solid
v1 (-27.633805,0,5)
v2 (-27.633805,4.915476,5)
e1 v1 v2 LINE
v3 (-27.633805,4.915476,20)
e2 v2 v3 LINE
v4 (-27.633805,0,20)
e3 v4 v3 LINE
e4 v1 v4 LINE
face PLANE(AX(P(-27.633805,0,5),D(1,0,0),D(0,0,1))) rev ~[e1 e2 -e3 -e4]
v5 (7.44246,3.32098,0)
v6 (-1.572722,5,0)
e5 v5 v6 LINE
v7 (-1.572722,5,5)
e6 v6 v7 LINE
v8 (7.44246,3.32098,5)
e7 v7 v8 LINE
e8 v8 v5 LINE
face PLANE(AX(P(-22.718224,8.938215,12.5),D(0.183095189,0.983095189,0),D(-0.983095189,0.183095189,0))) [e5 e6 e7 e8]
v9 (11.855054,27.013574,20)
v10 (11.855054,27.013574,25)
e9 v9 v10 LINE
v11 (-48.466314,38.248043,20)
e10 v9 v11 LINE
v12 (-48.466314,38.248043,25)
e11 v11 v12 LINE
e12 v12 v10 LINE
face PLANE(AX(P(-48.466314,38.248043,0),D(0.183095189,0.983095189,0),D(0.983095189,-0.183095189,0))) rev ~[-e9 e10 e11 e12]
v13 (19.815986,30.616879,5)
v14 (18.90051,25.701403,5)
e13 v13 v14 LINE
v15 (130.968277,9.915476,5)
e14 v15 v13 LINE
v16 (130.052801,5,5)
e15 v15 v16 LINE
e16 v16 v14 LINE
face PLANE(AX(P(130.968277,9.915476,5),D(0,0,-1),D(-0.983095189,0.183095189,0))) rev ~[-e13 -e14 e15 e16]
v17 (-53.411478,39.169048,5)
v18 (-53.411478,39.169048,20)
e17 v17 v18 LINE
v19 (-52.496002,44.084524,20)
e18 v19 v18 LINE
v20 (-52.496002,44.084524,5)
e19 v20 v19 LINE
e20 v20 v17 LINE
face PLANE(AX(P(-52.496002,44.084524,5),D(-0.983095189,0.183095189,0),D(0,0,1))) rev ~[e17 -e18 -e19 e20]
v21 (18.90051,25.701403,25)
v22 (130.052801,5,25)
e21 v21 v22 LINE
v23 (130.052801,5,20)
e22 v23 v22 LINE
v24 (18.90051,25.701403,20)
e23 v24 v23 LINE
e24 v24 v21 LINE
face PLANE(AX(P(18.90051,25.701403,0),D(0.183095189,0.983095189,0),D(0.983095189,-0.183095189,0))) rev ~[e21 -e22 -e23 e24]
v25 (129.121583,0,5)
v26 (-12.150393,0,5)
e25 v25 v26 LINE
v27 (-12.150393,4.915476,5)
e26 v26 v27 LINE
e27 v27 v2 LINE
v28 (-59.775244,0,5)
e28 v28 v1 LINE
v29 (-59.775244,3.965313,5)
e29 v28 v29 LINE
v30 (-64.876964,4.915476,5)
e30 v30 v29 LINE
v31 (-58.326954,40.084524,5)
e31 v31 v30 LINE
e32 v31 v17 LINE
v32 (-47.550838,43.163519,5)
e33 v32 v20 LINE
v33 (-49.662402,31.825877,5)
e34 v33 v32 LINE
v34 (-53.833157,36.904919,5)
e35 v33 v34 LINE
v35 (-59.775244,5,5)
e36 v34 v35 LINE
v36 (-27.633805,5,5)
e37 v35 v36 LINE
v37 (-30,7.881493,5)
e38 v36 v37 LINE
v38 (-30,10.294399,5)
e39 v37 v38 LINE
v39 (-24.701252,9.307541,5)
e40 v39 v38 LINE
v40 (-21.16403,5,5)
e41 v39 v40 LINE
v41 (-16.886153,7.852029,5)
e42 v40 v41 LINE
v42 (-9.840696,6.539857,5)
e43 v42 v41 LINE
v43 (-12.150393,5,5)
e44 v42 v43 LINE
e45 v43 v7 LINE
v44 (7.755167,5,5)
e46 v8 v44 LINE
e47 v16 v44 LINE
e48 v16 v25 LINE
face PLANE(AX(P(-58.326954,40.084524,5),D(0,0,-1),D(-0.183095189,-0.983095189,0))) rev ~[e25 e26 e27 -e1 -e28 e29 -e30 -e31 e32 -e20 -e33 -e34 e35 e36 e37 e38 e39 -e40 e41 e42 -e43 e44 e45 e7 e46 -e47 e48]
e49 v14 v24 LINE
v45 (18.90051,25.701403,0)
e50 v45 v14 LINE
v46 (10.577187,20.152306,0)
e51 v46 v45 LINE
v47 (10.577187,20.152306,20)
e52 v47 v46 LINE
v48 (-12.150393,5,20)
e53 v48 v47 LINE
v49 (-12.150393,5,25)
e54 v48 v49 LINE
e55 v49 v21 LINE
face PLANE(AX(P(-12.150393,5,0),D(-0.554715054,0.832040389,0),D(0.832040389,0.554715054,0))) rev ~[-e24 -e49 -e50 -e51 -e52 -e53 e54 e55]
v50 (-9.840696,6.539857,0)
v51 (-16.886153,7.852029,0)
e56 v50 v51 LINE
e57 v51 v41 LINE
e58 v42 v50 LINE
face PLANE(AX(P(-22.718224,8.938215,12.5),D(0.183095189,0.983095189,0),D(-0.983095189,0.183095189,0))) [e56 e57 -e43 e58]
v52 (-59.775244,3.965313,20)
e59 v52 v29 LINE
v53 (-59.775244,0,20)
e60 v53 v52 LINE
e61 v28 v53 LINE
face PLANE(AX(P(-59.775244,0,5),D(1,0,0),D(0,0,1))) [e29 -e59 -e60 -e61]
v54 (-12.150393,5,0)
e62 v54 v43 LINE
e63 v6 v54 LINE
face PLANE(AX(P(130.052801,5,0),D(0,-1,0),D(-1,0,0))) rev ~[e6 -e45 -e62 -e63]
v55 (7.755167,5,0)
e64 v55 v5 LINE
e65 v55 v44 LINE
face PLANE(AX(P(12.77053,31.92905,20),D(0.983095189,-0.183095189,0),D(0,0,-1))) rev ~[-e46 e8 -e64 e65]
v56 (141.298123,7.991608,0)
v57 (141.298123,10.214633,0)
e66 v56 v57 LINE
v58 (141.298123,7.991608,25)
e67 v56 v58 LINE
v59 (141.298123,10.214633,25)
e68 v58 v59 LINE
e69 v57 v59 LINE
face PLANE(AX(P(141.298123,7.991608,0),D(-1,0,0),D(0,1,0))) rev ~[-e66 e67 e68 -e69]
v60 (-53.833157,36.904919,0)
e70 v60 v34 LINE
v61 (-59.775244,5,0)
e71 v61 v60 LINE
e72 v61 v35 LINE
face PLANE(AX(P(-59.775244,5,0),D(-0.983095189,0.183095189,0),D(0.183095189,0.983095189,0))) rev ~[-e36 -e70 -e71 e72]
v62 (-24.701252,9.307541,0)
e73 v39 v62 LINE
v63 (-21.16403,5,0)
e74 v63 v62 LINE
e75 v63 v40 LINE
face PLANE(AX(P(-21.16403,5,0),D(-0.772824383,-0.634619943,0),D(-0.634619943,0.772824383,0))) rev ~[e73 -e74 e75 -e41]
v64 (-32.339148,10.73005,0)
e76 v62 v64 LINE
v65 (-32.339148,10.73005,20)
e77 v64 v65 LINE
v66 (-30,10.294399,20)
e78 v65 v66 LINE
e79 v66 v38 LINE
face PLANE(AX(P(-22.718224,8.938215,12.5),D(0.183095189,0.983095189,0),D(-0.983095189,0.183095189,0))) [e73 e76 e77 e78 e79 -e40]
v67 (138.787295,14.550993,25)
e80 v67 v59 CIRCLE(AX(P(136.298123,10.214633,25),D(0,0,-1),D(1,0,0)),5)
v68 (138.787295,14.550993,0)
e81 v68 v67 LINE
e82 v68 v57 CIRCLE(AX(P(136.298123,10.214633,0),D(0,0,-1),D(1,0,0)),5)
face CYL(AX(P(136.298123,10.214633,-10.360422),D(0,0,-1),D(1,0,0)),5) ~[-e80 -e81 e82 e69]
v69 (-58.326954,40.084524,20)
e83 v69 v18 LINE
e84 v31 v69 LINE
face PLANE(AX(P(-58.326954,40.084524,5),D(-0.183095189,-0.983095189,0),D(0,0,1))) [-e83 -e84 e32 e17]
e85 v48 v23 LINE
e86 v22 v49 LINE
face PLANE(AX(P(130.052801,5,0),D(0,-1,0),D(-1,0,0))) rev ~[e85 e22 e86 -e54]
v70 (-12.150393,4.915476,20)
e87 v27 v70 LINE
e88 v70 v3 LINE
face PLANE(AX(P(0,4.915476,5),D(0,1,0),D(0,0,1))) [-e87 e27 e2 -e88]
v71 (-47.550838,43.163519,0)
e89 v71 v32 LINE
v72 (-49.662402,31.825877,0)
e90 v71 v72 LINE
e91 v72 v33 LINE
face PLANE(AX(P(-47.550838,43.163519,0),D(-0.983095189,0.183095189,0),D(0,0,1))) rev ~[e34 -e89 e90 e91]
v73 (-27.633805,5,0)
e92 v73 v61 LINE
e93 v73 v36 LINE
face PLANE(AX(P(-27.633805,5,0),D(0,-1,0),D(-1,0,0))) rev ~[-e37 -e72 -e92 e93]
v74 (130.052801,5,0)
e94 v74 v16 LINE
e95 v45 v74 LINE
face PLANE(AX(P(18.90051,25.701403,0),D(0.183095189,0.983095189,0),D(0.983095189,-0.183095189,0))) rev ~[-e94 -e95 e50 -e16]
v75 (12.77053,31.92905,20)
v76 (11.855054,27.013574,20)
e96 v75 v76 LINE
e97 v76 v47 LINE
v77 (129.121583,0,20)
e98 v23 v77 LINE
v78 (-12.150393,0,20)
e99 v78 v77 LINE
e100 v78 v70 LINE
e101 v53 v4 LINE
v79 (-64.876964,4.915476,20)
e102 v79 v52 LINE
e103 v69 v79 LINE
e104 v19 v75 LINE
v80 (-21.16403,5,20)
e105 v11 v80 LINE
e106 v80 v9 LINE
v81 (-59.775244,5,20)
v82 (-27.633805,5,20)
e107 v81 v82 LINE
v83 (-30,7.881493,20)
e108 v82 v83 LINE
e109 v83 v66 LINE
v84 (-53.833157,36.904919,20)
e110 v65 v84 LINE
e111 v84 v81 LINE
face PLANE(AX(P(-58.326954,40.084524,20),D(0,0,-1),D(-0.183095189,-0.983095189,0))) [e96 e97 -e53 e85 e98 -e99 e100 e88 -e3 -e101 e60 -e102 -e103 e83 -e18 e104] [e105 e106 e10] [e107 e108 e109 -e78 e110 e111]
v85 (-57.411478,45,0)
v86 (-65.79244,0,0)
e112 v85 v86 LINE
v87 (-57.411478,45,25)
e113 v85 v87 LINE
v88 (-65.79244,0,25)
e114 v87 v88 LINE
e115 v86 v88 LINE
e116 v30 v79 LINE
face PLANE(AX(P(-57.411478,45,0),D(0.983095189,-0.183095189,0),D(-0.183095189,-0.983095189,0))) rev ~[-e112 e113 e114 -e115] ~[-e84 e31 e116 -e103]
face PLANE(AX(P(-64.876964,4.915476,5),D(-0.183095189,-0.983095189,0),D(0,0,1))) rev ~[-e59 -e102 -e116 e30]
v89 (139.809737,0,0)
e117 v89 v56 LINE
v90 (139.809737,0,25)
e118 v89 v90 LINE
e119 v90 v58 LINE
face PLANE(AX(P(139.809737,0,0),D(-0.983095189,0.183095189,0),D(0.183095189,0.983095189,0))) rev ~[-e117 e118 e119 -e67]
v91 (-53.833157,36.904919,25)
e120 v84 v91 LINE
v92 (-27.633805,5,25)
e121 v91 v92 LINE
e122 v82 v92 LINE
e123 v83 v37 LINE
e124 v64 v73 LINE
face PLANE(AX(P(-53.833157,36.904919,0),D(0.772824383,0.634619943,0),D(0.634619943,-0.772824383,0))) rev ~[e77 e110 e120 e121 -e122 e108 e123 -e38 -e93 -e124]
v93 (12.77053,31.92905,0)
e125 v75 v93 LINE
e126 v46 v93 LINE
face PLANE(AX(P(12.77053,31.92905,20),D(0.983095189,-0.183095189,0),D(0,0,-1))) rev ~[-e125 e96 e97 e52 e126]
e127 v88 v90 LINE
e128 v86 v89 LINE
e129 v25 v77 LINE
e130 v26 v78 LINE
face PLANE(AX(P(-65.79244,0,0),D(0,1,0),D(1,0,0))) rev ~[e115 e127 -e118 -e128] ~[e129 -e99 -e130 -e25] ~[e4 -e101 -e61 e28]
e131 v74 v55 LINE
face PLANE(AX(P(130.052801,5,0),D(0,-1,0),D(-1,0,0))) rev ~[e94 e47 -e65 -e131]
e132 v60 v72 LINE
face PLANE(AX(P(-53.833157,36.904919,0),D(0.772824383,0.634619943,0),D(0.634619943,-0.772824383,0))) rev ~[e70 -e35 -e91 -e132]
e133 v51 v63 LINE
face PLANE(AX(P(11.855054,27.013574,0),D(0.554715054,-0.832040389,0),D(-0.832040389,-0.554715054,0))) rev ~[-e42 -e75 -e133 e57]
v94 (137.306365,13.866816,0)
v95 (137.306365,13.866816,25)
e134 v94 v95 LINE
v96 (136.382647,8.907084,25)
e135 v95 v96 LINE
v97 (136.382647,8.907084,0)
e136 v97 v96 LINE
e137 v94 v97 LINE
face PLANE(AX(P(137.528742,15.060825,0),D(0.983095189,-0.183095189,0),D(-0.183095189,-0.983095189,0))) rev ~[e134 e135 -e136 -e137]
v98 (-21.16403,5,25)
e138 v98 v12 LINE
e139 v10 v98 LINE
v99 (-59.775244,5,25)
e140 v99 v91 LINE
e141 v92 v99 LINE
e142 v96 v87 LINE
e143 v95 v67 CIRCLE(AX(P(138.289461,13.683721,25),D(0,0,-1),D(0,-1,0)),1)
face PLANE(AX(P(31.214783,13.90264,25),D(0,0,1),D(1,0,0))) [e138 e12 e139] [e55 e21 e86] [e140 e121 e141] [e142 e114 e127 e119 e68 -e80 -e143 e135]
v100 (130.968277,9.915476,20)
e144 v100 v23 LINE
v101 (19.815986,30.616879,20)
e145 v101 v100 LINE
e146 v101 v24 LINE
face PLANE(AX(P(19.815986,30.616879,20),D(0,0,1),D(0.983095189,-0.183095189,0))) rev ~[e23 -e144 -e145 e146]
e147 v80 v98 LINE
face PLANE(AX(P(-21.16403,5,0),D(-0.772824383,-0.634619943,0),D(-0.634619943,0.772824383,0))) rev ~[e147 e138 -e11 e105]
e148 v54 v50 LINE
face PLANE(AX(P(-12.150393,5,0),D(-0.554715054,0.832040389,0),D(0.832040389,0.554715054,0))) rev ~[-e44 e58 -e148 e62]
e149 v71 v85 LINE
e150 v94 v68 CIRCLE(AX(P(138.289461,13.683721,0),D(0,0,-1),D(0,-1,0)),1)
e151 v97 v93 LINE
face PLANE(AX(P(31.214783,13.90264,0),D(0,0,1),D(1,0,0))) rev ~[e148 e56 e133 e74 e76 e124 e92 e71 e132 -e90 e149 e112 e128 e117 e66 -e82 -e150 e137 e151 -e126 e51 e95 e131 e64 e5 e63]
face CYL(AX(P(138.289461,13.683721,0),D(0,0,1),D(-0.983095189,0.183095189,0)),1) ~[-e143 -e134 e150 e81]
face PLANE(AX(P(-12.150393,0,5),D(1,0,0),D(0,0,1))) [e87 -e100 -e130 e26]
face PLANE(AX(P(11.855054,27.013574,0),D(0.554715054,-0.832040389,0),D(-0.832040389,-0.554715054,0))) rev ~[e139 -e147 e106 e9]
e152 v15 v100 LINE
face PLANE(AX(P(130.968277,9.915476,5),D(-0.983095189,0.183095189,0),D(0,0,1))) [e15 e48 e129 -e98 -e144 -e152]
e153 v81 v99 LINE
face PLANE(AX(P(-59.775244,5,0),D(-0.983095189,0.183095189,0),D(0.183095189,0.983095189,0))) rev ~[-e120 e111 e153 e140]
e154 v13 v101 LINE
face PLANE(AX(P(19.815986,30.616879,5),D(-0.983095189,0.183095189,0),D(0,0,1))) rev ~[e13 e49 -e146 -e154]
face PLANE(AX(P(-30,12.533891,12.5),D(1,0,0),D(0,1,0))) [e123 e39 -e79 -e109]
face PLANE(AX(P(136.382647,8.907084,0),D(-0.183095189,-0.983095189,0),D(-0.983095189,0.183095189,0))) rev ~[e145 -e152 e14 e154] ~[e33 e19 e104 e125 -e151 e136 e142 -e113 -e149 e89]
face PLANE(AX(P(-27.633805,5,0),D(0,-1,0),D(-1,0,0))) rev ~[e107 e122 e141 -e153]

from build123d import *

# Parameters (mm, degrees)
F1_DEPTH     = 25
F3_W         = 103.0636096465
F3_H         = 15
F3_W_2       = 5
F3_W_3       = 5.0301977637
F4_DEPTH     = 29.1
F5_W         = 32.1414392277
F5_H         = 15
F5_W_2       = 37.424231063
F6_DEPTH     = 5
F8_W         = 35.7737973711
F8_H         = 15
F9_DEPTH     = 25
F10_T1_DEPTH = 45.720844557
F11_R        = 1
F12_W        = 15.2368300635
F12_H        = 15
F13_DEPTH    = 30


# Not quite as in the source:
# - a fillet or chamfer that OpenCascade refuses, or shapes differently, is made with other operations: its cross-section is extruded or revolved along the edge and cut away or added


with BuildPart() as f1:
    # F0 (on Top) → F1 (new body)
    with BuildSketch(Plane.XY):
        Polygon((-57.4114776212, 45), (-65.7924397243, 0), (139.809737024, 0), (141.2981229206, 7.9916081853), (136.3826469731, 8.9070841327), align=None)
        Polygon((18.9005100522, 25.701403032), (130.0528008015, 5), (-12.1503930873, 5), (-21.1640298367, 5), (-27.6338049994, 5), (-59.7752442271, 5), (-53.8331571099, 36.9049193859), (-53.4114776212, 39.1690481052), (-48.4663143975, 38.2480430925), (11.8550538619, 27.0135741727), align=None, mode=Mode.SUBTRACT)
        Polygon((136.3826469731, 8.9070841327), (141.2981229206, 7.9916081853), (141.2981229206, 14.3588015401), (137.528741777, 15.0608246626), align=None)
        Polygon((-27.6338049994, 5), (-21.1640298367, 5), (-48.4663143975, 38.2480430925), (-53.4114776212, 39.1690481052), (-53.8331571099, 36.9049193859), align=None)
        Polygon((-12.1503930873, 5), (18.9005100522, 25.701403032), (11.8550538619, 27.0135741727), (-21.1640298367, 5), align=None)
    extrude(amount=F1_DEPTH)

    # F3 (on offset) → F4 (cut)
    with BuildSketch(Plane(origin=(6.1753463271, 33.1573608496, 0), x_dir=(-0.9830951895, 0.1830951895, 0), z_dir=(0.1830951895, 0.9830951895, 0))):
        with Locations((-70.4070020763, 12.5)):
            Rectangle(F3_W, F3_H)
        Polygon((49.6500332337, 20), (-1.7085909409, 20), (-1.7085909409, 5), (0, 5), (49.6500332337, 5), align=None)
        with Locations((-124.4388068995, 12.5)):
            Rectangle(F3_W_2, F3_H)
        with Locations((-16.375197253, 12.5)):
            Rectangle(F3_W_2, F3_H)
        Polygon((-1.7085909409, 20), (-6.7085909409, 20), (-6.7085909409, 0), (54.6500332337, 0), (54.6500332337, 5), (49.6500332337, 5), (0, 5), (-1.7085909409, 5), align=None)
        with Locations((52.1500332337, 12.5)):
            Rectangle(F3_W_2, F3_H)
        with Locations((57.1651321155, 12.5)):
            Rectangle(F3_W_3, F3_H)
    extrude(amount=-F4_DEPTH, mode=Mode.SUBTRACT)

    # F5 (on Front) → F6 (cut)
    with BuildSketch(Plane.XZ):
        with Locations((-43.7045246133, 12.5)):
            Rectangle(F5_W, F5_H)
        with Locations((6.5617224442, 12.5)):
            Rectangle(F5_W_2, F5_H)
    extrude(amount=-F6_DEPTH, mode=Mode.SUBTRACT)

    # F8 (on offset) → F9 (cut)
    with BuildSketch(Plane(origin=(-63.5868239483, 11.8426391504, 0), x_dir=(-0.1830951895, -0.9830951895, 0), z_dir=(-0.9830951895, 0.1830951895, 0))):
        with Locations((-10.8406194676, 12.5)):
            Rectangle(F8_W, F8_H)
    extrude(amount=-F9_DEPTH, mode=Mode.SUBTRACT)

    # F10: fillet of radius 5 on 1 edges, made by hand

    # F10_s2 → F10_t1 (cut)
    with BuildSketch(Plane.XY.offset(-10.3604222785)):
        with BuildLine():
            ThreePointArc((141.2981229206, 10.2146326287), (140.2448363813, 13.2843969289), (137.528741777, 15.0608246626))
            Line((137.528741777, 15.0608246626), (141.2981229206, 14.3588015401))
            Line((141.2981229206, 14.3588015401), (141.2981229206, 10.2146326287))
        make_face()
    extrude(amount=F10_T1_DEPTH, mode=Mode.SUBTRACT)

    # F11
    f11_edges = [f1.edges().sort_by_distance(p)[0] for p in [
        (137.528742, 15.060825, 12.5),
    ]]
    fillet(f11_edges, radius=F11_R)

    # F12 (on Right) → F13 (cut)
    with BuildSketch(Plane.YZ):
        with Locations((12.5338909792, 12.5)):
            Rectangle(F12_W, F12_H)
    extrude(amount=-F13_DEPTH, mode=Mode.SUBTRACT)


solid = f1.part
